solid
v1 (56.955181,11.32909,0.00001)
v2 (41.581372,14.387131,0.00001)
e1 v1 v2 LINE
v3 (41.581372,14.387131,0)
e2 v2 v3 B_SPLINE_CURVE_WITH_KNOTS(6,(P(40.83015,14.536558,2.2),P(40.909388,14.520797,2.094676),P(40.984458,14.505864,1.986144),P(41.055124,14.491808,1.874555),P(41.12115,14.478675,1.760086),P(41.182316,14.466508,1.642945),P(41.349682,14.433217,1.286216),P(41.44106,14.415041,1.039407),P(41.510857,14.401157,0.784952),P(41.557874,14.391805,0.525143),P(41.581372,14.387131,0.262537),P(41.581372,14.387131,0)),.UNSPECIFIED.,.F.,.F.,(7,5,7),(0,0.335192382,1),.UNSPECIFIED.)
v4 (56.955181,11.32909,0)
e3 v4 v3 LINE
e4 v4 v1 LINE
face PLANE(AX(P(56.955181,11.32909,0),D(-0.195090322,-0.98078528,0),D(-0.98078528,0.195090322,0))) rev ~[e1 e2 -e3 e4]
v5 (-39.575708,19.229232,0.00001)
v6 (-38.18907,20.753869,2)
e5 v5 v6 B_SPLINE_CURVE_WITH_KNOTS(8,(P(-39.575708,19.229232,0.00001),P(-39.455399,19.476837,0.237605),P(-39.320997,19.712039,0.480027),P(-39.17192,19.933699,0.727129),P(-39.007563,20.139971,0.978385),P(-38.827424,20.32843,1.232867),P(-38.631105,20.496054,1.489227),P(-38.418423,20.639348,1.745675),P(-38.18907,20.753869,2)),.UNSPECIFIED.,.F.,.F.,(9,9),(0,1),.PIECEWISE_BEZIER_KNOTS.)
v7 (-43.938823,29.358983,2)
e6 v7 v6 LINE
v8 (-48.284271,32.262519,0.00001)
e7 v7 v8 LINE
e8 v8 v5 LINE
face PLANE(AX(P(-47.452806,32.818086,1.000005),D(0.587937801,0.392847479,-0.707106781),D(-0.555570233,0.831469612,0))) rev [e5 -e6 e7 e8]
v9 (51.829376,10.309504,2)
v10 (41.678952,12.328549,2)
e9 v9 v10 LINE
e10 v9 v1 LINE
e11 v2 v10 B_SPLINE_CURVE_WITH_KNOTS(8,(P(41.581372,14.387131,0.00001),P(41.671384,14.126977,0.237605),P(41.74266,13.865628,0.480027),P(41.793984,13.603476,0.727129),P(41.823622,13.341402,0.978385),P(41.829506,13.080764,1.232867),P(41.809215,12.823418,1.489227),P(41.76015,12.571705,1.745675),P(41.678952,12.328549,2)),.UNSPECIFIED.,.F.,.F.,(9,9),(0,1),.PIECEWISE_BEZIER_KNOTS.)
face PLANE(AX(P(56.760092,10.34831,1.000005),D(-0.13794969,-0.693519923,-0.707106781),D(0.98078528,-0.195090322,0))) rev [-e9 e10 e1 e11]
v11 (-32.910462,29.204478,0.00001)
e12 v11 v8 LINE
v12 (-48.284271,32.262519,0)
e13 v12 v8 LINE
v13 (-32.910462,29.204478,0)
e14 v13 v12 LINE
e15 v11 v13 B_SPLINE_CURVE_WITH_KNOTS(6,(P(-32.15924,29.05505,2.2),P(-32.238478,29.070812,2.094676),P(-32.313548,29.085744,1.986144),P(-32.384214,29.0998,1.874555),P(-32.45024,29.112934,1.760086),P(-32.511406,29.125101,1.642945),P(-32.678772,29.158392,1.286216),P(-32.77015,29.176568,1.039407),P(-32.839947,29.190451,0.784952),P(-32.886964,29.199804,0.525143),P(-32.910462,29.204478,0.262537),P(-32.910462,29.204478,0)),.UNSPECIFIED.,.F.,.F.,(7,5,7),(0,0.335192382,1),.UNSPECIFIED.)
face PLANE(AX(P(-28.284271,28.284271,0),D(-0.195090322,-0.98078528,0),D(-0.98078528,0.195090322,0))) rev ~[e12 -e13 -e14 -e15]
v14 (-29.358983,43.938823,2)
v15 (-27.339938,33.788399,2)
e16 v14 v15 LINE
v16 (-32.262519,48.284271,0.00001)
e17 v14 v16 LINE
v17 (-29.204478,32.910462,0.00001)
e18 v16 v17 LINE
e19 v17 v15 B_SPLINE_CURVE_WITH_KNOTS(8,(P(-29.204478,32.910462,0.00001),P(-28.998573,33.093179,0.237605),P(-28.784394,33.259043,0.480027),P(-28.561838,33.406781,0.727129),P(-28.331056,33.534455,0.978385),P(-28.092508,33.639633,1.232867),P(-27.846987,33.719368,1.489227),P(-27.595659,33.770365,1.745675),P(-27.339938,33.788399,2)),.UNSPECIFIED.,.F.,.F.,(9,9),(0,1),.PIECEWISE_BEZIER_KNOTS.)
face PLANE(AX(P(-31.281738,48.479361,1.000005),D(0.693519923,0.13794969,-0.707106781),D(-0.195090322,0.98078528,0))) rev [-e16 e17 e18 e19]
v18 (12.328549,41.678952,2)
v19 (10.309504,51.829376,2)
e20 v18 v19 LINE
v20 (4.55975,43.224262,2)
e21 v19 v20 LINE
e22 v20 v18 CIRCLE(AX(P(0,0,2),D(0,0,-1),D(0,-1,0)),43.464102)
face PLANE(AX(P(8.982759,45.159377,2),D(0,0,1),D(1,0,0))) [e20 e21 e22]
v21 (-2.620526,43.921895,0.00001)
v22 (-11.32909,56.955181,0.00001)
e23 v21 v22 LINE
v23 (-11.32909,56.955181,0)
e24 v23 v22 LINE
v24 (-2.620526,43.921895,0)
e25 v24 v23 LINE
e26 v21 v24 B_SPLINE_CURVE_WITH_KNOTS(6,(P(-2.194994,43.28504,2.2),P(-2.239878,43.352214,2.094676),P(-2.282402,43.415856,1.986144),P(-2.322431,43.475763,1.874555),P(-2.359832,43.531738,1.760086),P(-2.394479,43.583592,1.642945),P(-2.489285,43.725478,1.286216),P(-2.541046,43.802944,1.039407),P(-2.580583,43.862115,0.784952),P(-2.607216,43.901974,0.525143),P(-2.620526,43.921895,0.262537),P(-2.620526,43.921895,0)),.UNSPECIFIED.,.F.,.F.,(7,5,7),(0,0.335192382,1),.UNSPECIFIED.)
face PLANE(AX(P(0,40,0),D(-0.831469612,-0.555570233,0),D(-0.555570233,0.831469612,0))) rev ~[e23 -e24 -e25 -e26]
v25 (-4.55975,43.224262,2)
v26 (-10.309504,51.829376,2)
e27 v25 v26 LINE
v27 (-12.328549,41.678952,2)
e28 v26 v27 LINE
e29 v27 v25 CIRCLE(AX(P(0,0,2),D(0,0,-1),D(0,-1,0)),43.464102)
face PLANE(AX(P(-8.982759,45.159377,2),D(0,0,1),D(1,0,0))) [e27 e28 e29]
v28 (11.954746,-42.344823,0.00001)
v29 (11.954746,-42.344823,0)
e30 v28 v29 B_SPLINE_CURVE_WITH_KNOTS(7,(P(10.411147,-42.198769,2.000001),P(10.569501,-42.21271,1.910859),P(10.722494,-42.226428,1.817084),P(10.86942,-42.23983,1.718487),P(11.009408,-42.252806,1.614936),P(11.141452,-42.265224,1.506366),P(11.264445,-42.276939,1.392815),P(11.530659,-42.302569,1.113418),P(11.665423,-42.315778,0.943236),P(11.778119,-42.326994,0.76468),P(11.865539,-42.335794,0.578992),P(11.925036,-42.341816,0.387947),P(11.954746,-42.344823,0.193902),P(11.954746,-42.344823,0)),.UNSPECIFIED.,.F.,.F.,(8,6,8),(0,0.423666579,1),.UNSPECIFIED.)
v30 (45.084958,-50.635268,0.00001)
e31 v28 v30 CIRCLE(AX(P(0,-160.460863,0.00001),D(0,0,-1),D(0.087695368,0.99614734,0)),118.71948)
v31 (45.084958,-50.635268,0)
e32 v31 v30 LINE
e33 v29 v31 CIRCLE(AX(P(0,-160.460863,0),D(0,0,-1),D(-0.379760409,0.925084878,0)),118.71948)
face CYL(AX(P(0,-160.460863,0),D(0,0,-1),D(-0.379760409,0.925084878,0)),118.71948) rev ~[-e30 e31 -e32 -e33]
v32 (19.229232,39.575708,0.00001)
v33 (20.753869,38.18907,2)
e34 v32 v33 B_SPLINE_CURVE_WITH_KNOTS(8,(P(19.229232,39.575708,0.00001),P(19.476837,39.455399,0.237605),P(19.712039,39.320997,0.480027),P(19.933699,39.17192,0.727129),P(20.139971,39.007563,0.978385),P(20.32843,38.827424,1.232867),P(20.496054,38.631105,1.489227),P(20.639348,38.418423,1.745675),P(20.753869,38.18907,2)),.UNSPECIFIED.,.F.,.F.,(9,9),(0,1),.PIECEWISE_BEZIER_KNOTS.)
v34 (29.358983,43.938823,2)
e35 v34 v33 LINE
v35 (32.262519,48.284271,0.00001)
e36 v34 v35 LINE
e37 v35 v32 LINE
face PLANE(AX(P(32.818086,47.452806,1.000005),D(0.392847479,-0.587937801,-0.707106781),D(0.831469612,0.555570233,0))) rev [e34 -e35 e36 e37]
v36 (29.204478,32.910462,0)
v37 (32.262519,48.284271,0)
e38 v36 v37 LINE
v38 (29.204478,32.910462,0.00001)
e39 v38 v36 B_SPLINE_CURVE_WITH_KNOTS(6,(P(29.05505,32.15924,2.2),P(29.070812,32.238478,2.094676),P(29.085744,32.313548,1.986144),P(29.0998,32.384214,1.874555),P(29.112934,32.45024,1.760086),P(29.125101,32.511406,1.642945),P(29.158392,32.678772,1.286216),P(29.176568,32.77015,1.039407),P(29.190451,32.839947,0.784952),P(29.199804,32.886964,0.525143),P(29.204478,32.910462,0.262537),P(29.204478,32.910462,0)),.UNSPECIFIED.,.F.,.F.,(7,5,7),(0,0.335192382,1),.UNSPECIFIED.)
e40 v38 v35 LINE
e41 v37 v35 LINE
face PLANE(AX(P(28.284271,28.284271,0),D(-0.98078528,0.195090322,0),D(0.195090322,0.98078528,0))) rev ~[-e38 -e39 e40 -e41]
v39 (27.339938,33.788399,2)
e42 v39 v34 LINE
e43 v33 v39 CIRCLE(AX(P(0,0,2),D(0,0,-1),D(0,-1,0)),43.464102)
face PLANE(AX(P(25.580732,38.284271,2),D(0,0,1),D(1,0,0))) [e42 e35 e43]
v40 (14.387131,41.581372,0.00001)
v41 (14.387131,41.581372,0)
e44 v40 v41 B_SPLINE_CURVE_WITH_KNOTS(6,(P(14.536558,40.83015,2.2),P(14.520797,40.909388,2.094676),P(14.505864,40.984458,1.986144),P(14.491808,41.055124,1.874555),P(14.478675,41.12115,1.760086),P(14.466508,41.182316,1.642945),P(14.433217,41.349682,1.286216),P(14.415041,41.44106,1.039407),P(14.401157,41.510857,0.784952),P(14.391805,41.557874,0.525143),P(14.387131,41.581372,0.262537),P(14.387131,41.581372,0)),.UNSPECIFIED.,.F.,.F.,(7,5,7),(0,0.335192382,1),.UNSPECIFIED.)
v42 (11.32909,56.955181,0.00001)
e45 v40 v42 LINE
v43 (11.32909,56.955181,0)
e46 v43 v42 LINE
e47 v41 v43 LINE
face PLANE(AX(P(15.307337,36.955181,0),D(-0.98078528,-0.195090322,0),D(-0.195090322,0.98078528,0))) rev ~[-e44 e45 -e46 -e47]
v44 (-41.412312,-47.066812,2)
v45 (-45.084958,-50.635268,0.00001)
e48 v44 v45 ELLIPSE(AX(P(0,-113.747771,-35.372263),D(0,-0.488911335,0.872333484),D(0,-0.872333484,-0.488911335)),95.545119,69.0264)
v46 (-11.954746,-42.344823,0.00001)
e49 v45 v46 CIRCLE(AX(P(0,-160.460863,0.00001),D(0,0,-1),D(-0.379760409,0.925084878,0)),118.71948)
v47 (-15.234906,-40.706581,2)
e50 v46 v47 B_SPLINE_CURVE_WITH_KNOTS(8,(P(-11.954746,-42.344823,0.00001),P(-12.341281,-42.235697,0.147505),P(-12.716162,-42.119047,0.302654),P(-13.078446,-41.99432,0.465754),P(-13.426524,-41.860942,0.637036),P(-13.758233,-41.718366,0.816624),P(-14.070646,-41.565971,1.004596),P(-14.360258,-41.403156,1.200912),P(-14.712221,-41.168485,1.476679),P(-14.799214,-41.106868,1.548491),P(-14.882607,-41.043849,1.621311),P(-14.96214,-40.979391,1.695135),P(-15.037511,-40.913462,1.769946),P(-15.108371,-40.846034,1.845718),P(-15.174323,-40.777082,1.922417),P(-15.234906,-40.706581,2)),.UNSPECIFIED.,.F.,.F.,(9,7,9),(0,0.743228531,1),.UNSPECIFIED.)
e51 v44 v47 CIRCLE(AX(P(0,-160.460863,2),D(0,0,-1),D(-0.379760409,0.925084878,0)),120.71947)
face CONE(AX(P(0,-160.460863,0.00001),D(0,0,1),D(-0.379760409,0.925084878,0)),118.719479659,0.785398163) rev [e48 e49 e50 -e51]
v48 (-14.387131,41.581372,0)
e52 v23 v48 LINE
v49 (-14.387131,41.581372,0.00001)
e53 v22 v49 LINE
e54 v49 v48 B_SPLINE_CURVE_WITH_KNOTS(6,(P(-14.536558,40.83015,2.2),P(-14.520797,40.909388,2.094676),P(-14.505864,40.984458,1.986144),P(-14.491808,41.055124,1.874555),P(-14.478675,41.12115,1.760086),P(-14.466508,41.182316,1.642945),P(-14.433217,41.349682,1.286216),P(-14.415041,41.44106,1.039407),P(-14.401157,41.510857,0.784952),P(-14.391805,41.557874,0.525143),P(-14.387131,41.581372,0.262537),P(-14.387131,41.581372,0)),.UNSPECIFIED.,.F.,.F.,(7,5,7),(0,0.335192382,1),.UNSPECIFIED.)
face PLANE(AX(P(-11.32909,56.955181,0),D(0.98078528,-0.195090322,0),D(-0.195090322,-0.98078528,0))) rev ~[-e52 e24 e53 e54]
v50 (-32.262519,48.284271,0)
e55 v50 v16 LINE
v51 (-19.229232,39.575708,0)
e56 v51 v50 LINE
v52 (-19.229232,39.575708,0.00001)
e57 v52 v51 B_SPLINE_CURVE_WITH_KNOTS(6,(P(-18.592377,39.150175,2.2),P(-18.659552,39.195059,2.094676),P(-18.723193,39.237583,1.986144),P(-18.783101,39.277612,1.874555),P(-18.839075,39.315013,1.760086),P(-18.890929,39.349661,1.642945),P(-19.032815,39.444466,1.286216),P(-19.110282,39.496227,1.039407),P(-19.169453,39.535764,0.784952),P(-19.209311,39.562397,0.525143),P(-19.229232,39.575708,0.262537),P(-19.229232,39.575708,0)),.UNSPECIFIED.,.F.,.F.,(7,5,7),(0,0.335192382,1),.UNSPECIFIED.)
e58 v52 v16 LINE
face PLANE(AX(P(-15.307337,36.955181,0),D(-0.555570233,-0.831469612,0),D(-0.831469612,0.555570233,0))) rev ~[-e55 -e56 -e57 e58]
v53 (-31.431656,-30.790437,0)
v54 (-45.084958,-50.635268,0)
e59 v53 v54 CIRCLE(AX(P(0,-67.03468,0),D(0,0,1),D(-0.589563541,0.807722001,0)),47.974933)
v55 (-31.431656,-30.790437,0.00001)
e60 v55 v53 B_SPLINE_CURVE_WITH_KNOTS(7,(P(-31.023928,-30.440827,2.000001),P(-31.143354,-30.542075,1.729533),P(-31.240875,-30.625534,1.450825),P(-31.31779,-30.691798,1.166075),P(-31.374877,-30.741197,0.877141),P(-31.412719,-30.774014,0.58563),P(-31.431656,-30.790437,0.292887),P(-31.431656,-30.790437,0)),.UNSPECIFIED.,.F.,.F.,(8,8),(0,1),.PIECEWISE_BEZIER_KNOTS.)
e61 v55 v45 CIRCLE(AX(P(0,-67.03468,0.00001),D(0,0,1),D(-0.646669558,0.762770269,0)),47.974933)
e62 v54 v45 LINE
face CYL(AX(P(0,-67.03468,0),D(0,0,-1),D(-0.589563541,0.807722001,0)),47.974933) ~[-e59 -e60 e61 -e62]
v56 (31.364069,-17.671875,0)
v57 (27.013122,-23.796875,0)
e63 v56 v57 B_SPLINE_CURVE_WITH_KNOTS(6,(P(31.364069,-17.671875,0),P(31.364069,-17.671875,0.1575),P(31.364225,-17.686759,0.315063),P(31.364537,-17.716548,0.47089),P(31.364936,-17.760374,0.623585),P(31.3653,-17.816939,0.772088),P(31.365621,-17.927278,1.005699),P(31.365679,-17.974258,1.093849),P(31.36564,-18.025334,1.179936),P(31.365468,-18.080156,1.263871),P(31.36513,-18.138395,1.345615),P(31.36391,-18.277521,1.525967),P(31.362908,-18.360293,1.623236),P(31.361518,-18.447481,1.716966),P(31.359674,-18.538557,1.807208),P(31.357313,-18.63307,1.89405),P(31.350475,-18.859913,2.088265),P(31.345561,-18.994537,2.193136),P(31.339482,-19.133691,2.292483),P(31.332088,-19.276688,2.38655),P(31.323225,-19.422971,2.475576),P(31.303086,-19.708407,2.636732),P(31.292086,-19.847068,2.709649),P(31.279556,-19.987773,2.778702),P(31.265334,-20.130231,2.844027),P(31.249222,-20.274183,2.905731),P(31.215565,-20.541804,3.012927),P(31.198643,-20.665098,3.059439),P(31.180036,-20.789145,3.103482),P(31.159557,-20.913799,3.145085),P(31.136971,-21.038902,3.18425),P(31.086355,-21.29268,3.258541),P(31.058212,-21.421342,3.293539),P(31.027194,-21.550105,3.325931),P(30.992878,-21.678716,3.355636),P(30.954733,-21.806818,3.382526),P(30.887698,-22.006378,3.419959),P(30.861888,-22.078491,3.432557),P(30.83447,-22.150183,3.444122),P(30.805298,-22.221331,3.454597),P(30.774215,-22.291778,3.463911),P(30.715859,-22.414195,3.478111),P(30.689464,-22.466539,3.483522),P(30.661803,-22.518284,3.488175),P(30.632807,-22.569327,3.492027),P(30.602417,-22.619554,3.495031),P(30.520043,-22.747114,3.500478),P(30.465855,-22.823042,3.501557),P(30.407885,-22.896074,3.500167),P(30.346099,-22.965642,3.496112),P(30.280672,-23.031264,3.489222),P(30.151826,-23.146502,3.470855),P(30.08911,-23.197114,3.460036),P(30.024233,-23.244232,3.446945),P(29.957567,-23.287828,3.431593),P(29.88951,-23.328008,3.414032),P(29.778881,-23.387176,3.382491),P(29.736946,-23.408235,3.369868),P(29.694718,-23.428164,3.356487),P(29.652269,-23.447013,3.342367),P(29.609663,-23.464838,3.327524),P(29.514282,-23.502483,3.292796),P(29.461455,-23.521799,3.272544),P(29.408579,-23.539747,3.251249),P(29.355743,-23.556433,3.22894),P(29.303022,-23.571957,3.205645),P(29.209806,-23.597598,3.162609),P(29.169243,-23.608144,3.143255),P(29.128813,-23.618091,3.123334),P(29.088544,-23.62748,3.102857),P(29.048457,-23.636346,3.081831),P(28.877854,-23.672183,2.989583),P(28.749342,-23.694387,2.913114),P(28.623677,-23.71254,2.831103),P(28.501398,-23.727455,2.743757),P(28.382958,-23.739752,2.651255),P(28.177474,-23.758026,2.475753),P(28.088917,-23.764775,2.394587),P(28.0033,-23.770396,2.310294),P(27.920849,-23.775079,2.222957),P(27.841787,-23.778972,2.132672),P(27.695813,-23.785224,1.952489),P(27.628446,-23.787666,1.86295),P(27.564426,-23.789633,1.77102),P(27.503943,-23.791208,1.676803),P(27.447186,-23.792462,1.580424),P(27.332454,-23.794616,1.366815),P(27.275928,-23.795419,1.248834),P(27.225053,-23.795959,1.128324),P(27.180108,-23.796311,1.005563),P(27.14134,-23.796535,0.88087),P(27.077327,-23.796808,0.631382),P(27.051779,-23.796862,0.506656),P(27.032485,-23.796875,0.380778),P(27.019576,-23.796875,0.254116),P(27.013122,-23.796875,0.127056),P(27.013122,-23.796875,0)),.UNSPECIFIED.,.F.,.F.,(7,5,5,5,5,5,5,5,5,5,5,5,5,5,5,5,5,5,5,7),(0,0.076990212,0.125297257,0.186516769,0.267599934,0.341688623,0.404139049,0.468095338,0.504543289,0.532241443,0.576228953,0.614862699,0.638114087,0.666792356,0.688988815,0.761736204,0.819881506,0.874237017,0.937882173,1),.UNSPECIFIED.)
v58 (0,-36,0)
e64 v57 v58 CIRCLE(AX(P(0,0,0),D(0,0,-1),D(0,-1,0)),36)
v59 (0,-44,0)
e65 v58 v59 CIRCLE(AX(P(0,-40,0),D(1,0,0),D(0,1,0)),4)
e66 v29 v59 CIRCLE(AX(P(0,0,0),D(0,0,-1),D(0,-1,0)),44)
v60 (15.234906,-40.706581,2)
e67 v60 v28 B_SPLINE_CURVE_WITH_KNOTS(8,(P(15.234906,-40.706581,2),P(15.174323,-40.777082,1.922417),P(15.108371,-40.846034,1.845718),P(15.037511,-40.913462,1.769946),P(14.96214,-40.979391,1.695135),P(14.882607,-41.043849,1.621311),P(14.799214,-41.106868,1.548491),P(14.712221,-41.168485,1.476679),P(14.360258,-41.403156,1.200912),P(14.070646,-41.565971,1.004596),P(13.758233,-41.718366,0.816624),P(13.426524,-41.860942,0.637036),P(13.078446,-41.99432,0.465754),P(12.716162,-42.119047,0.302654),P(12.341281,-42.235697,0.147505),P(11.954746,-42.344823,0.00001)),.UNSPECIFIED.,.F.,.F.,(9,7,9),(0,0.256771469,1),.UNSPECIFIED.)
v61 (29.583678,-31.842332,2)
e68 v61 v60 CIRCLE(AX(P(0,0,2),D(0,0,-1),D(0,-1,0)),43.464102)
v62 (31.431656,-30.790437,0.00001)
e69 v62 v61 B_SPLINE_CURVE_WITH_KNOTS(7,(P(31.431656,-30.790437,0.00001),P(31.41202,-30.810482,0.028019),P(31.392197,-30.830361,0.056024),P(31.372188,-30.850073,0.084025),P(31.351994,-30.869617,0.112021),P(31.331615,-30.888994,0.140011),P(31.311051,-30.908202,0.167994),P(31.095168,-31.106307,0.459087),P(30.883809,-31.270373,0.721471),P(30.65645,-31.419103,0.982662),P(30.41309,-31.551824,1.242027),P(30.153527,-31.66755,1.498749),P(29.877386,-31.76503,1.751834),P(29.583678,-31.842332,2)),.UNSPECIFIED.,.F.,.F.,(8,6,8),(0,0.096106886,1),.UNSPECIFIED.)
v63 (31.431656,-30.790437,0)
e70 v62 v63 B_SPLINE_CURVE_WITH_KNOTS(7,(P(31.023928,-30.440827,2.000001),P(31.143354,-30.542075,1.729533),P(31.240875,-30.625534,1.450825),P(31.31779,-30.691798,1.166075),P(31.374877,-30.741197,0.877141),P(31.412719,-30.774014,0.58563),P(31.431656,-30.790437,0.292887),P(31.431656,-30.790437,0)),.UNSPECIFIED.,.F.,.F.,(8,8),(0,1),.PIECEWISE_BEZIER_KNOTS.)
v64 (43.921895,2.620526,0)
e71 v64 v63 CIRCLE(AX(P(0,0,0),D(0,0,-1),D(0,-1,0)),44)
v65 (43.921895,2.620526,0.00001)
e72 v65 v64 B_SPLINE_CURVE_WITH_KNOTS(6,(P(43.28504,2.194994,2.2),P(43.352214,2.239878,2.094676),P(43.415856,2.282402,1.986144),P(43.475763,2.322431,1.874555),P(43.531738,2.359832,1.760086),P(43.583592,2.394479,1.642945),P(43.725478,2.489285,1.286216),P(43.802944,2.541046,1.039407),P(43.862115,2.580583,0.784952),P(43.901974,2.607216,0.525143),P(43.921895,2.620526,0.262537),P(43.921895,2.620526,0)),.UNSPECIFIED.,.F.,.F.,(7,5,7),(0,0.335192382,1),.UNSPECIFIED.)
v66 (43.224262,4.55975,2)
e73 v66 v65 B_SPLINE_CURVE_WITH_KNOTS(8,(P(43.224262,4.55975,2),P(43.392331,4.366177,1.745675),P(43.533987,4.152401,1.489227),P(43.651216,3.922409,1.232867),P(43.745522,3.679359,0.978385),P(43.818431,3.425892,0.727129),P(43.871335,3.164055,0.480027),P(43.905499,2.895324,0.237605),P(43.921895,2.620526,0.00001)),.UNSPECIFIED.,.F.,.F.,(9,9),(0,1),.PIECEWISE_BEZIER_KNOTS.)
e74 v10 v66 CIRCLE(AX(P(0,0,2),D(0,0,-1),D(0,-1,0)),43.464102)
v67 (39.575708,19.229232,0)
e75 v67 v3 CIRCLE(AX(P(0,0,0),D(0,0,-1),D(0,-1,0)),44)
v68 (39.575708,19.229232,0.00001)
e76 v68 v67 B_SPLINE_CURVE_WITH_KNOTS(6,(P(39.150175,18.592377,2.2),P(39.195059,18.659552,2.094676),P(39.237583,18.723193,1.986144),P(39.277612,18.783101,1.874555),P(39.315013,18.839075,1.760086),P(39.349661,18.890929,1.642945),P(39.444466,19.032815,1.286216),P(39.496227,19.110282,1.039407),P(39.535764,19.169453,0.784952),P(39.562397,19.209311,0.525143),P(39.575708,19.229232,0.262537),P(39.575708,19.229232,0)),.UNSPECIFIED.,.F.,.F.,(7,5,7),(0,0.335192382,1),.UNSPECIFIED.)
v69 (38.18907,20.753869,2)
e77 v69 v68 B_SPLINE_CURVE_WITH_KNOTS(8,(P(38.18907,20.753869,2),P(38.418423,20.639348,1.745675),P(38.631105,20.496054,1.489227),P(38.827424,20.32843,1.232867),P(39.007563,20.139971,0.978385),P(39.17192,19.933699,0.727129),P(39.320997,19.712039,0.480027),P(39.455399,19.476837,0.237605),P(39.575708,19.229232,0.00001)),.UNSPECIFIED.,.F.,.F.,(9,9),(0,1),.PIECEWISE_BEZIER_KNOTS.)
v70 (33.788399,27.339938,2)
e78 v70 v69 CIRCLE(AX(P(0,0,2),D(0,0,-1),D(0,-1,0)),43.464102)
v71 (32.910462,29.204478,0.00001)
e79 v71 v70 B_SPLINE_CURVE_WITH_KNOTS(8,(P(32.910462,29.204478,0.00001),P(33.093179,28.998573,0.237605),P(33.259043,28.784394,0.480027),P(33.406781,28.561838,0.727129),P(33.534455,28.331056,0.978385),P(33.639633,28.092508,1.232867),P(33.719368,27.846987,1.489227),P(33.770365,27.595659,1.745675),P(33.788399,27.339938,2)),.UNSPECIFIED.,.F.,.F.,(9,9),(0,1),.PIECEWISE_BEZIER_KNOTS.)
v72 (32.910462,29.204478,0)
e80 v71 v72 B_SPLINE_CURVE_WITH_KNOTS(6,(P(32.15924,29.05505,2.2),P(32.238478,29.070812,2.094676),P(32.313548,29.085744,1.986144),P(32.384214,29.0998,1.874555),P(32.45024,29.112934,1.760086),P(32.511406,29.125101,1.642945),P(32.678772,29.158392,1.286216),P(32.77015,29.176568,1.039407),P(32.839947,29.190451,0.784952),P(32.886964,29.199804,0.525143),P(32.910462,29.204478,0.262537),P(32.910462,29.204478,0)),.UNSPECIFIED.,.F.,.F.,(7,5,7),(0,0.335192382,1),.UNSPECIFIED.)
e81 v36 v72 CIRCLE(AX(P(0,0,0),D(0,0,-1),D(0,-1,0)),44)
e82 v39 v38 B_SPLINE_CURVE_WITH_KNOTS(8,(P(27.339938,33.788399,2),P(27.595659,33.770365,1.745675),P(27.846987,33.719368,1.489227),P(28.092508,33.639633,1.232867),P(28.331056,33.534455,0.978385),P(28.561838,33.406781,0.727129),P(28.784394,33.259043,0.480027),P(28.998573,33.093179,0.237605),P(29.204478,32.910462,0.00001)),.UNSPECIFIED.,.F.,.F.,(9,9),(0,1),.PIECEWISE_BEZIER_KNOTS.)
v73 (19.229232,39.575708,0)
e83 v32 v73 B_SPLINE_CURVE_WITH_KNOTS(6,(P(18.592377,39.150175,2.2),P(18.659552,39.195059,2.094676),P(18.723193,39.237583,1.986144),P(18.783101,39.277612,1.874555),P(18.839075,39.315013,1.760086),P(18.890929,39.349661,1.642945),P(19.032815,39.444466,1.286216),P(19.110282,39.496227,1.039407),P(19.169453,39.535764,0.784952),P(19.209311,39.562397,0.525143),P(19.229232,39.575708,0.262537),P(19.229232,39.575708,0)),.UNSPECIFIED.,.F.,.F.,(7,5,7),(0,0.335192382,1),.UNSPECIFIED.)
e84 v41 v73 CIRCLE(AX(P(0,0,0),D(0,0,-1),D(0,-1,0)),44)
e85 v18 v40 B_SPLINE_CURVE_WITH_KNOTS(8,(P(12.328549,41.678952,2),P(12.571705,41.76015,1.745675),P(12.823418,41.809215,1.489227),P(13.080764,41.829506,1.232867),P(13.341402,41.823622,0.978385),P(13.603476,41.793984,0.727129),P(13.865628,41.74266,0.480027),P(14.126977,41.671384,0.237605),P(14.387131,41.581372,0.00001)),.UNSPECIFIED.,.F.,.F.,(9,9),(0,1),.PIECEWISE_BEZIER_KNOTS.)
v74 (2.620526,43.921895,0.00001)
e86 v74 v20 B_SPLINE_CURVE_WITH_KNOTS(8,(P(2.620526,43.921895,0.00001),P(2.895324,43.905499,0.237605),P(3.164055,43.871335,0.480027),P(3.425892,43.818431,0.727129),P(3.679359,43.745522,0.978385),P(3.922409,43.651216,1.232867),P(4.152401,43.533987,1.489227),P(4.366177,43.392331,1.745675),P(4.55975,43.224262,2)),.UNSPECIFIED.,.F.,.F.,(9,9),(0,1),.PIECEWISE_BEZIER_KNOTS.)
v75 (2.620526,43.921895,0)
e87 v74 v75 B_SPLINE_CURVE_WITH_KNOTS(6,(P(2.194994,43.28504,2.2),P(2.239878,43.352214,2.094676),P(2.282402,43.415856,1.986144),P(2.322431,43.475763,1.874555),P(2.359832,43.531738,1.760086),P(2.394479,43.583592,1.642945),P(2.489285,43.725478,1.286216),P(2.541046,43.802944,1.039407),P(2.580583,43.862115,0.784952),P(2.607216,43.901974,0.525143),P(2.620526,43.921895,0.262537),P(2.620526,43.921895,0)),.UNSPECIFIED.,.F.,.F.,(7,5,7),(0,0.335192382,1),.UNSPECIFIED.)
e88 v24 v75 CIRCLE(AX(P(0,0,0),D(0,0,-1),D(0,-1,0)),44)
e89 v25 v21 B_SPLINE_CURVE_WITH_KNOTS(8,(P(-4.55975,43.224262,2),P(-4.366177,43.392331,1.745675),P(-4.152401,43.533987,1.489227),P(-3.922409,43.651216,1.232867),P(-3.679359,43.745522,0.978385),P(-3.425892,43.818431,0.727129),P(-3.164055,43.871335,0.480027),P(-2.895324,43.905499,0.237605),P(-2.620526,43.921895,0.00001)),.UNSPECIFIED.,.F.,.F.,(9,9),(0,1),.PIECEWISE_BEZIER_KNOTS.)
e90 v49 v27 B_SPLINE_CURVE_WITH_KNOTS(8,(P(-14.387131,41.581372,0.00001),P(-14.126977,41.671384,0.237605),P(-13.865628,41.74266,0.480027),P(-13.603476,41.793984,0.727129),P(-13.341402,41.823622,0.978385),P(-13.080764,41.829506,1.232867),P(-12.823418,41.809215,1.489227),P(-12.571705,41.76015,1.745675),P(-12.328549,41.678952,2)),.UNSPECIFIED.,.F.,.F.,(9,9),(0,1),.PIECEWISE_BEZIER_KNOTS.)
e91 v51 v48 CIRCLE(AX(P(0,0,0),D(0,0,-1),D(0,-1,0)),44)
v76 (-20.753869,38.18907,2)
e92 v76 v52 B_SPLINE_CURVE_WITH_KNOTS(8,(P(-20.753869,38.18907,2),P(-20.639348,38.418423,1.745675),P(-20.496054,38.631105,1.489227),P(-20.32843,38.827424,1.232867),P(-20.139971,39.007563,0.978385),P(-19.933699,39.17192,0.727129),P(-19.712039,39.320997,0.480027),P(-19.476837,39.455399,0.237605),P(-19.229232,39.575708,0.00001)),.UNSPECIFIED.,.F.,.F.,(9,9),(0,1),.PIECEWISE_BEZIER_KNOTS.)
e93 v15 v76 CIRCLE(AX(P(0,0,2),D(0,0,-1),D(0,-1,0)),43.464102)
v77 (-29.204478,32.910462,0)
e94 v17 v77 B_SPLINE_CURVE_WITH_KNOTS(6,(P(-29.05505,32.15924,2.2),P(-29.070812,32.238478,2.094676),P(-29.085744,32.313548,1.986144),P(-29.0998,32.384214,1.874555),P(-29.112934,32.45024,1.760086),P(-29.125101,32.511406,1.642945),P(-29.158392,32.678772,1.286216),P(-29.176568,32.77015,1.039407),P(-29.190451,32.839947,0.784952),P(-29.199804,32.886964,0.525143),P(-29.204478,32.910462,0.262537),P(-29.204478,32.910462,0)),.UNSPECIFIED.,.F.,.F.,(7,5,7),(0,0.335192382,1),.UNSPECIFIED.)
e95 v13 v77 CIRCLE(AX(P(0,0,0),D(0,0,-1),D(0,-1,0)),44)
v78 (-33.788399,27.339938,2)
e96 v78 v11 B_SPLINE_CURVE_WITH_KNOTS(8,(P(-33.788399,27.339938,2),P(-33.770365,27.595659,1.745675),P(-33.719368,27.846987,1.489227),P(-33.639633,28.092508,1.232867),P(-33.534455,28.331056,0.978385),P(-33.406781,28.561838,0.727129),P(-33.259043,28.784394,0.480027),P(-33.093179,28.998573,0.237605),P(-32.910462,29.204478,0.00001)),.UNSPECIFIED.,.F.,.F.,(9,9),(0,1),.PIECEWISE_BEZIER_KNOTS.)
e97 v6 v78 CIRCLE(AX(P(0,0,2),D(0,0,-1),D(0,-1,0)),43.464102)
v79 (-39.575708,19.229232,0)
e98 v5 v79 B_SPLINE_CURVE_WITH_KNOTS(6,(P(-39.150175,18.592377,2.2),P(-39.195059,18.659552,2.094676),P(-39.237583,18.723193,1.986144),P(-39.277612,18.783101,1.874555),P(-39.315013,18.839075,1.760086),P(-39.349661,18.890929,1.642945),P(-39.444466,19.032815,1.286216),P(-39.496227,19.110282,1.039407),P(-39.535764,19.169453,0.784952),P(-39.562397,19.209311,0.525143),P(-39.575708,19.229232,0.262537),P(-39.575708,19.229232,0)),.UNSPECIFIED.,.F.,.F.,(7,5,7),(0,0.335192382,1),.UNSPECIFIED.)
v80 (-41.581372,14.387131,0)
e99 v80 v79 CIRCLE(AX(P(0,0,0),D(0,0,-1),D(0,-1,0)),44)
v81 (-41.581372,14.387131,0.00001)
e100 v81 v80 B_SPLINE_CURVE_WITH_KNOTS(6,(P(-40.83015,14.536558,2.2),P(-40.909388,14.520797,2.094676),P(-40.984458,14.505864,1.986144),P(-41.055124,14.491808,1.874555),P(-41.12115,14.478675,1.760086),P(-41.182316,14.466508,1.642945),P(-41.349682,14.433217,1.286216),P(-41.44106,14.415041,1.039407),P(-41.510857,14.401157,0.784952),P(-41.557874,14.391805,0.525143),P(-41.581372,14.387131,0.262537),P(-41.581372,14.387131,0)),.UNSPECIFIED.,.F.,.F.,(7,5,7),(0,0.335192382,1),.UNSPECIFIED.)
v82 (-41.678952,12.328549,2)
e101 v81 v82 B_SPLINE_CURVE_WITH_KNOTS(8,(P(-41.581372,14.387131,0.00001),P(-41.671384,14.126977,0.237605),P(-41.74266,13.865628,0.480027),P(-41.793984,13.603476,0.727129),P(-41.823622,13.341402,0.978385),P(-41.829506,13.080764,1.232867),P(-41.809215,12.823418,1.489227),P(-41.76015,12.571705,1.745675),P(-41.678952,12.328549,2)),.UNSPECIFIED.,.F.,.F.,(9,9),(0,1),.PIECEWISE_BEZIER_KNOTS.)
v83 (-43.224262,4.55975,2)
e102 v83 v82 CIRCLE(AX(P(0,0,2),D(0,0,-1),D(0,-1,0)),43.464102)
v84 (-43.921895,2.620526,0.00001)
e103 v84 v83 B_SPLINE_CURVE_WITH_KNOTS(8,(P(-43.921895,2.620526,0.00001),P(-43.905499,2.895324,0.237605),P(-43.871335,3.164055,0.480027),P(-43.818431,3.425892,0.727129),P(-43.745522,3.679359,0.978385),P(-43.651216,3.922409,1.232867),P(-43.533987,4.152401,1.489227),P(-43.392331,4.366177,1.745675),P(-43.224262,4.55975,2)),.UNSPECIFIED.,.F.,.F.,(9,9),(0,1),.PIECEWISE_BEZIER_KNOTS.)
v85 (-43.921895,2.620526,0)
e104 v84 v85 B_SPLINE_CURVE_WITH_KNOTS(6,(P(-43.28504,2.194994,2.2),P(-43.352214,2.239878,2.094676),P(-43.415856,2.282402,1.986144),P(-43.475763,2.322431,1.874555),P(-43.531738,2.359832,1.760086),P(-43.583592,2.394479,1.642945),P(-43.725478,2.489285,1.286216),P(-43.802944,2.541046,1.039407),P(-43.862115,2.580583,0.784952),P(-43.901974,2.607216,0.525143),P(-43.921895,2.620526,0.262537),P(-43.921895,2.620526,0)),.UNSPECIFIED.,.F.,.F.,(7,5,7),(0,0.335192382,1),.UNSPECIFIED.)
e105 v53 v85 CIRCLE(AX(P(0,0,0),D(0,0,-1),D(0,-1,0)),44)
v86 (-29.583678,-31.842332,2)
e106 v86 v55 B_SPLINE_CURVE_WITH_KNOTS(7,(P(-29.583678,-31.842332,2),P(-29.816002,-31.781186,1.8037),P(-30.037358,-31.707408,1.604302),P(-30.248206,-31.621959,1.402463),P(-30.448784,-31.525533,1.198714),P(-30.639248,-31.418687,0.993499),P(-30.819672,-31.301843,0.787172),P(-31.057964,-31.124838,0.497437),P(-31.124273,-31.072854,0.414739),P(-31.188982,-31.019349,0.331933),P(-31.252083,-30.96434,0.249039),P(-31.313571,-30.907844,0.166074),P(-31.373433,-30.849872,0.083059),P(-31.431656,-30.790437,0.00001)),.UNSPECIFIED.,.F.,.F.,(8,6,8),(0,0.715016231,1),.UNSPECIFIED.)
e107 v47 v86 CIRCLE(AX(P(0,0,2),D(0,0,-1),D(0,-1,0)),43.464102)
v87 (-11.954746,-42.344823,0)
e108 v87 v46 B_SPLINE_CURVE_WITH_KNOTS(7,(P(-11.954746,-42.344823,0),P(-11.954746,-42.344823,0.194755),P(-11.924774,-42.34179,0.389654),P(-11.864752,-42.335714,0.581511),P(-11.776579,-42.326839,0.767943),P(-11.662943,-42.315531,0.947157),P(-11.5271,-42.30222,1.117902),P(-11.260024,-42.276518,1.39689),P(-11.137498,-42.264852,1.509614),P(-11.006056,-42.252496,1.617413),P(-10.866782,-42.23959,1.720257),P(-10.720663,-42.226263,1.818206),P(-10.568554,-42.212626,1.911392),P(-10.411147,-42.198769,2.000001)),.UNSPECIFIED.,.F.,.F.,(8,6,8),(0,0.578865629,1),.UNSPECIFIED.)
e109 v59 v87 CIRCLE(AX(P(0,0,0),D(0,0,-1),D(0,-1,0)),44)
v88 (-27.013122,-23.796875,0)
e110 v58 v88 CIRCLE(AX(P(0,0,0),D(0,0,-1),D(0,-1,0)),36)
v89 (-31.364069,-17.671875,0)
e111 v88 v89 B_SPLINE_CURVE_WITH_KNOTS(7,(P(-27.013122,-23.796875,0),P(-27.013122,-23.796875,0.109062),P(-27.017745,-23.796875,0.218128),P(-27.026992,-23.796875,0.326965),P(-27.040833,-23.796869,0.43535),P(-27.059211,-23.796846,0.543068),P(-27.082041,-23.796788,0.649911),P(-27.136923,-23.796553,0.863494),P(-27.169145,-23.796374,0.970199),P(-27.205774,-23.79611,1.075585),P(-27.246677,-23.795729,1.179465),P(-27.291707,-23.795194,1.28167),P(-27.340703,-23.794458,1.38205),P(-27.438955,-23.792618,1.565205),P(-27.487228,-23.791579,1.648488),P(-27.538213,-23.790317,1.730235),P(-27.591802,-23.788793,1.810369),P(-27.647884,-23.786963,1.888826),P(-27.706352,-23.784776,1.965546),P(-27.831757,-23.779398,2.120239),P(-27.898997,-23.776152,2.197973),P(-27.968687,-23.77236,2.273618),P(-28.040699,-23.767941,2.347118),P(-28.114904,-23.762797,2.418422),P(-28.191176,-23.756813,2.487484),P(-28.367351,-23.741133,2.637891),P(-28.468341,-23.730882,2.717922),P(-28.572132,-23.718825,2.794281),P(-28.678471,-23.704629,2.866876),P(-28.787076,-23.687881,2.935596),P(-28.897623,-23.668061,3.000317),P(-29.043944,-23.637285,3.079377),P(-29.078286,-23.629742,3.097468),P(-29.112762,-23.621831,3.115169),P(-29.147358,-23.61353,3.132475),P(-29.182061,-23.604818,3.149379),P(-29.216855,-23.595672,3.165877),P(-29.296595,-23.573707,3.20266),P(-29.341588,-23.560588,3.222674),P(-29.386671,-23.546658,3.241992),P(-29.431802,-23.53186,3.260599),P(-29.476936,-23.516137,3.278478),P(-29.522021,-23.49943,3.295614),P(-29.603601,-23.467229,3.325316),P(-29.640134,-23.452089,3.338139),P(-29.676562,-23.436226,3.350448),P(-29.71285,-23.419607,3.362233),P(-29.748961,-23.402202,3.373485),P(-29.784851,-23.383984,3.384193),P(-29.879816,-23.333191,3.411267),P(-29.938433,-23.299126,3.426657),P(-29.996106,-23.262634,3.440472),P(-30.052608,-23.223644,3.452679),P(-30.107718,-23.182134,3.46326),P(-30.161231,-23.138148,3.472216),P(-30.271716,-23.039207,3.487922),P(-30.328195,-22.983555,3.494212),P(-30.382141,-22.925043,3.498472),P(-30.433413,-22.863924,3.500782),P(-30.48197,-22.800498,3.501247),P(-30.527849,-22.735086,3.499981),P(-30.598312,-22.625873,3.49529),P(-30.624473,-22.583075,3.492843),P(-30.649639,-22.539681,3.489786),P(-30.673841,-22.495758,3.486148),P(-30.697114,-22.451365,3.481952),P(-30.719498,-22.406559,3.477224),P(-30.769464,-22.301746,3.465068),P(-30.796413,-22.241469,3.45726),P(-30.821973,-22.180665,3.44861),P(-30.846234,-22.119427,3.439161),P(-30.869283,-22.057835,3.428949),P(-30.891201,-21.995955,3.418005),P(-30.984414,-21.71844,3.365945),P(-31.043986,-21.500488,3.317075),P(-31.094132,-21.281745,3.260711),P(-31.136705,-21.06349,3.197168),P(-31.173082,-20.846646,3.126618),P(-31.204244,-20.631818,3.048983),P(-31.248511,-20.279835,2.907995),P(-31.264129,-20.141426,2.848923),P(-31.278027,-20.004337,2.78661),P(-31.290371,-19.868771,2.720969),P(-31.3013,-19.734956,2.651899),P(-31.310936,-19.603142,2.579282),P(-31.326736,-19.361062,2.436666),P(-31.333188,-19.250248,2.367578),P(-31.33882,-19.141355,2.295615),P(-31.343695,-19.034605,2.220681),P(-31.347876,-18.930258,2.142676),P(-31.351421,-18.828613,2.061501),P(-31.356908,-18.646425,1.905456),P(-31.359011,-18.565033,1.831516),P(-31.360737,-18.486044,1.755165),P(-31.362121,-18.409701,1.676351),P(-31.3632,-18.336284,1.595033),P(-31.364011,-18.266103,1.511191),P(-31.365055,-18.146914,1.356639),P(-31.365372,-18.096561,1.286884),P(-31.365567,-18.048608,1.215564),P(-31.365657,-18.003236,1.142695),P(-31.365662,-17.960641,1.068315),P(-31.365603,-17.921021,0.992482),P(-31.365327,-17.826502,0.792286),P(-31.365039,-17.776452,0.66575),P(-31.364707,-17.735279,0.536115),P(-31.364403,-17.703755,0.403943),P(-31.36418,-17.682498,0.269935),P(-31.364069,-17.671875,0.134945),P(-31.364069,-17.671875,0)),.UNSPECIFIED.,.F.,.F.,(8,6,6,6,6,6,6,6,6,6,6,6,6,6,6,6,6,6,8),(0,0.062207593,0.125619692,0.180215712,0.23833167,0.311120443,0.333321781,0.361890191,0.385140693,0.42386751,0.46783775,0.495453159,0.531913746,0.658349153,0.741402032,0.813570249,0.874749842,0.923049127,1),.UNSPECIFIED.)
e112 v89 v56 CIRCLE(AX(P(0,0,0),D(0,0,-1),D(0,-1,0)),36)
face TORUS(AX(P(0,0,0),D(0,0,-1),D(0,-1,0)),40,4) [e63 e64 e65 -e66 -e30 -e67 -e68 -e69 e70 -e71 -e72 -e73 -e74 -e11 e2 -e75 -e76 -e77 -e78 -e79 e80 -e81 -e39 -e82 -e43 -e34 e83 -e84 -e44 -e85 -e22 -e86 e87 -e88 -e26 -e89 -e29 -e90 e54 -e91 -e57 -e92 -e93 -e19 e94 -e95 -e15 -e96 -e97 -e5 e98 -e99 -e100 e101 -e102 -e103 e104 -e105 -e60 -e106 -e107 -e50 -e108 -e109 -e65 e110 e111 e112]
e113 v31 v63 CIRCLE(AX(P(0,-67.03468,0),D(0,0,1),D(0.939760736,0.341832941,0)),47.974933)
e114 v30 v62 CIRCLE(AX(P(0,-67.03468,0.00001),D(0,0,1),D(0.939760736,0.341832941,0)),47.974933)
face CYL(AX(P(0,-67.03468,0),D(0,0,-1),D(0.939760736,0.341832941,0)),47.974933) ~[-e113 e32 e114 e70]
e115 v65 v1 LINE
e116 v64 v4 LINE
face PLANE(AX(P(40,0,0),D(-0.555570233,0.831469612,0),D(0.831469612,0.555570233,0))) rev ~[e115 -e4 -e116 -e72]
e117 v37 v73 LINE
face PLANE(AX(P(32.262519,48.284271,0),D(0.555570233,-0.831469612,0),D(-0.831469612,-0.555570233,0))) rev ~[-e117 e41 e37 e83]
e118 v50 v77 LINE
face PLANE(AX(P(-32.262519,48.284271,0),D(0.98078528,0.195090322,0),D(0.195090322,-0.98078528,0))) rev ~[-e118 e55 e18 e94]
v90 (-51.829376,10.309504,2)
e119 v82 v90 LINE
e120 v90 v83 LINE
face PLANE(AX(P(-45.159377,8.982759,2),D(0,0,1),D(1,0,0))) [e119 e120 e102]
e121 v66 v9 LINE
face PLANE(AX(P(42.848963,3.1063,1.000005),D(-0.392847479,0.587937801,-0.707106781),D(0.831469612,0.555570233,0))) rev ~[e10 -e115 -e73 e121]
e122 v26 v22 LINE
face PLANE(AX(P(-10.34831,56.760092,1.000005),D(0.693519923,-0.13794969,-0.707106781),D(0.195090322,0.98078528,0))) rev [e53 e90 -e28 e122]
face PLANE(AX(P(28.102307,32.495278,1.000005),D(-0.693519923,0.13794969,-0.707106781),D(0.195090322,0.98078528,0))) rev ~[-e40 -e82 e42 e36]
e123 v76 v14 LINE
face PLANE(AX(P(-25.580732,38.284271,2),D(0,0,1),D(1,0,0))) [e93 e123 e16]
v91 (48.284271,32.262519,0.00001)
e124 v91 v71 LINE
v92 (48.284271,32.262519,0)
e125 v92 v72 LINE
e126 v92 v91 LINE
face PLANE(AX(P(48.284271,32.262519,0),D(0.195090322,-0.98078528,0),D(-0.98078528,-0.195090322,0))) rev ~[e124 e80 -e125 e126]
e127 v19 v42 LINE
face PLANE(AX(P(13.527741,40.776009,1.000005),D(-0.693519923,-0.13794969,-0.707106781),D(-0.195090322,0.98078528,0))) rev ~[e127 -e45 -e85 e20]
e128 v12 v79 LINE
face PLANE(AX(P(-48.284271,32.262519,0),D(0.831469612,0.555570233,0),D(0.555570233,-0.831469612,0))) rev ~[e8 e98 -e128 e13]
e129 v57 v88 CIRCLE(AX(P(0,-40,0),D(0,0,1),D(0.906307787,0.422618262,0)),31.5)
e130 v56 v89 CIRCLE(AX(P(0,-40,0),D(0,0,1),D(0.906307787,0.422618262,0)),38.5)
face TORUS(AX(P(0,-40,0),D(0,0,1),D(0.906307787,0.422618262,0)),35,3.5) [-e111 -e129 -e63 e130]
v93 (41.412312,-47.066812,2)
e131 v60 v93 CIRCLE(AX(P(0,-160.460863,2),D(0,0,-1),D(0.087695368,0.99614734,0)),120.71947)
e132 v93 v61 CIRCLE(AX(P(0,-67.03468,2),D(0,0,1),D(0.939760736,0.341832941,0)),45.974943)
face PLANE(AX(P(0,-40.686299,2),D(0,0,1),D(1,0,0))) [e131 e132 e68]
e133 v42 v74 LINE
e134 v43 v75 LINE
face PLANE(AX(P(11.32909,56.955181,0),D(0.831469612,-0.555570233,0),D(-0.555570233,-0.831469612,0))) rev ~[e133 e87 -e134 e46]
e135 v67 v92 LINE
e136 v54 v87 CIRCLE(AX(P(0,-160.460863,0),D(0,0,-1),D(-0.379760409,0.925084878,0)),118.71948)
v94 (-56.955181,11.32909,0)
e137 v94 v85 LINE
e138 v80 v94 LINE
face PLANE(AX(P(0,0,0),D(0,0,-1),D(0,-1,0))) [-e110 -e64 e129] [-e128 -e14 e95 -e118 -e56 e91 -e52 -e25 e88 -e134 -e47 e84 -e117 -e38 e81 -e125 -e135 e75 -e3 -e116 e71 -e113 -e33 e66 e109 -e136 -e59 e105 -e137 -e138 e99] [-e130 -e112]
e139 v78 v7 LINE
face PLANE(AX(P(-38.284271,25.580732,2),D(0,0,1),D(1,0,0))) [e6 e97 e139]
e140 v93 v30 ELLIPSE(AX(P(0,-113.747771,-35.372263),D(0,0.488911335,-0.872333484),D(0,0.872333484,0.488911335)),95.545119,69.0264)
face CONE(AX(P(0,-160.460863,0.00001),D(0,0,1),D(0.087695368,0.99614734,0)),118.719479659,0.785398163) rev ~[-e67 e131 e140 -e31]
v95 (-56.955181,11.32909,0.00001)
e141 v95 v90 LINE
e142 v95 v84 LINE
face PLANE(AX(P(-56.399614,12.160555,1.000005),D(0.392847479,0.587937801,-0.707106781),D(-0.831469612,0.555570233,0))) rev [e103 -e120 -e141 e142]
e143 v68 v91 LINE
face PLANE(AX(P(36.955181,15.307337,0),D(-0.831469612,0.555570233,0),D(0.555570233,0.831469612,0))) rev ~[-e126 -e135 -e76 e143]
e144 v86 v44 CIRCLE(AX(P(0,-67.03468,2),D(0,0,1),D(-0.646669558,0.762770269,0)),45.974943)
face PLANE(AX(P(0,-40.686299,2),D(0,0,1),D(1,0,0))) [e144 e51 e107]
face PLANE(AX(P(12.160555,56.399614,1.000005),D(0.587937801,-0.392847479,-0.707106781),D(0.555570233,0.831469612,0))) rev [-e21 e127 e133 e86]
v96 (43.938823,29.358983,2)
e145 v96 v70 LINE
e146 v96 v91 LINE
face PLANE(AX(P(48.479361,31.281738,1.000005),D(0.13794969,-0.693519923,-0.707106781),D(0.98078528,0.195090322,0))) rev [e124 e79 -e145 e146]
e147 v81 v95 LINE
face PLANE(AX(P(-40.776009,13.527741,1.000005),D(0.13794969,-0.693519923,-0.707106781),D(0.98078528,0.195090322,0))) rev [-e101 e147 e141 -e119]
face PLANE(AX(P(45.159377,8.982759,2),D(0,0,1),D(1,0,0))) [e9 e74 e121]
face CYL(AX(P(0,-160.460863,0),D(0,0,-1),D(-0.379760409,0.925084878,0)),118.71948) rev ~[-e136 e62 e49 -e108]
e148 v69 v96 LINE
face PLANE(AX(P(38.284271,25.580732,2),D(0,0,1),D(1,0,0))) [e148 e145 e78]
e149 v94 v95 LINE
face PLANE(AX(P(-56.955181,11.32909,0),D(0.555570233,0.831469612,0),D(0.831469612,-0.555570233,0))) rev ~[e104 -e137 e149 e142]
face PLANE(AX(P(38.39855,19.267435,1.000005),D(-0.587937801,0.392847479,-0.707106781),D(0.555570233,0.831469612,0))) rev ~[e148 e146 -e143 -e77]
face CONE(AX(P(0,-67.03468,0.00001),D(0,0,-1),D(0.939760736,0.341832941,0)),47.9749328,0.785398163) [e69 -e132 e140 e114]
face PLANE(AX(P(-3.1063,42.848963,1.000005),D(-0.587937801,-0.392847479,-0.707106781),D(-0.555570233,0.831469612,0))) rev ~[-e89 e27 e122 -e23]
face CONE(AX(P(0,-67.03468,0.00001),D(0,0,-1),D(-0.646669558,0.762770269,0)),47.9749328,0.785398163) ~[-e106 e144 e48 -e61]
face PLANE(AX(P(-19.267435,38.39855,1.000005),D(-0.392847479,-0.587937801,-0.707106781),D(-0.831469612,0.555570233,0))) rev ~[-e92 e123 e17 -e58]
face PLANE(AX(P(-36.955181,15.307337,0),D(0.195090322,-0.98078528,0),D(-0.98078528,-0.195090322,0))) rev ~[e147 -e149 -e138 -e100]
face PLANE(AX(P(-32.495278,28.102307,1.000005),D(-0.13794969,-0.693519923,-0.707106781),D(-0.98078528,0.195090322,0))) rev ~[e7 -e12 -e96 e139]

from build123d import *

# Parameters (mm, degrees)
F3_DEPTH      = 2
F4_SIZE       = 1.99999
F6_ANGLE_BACK = 65
F6_ANGLE      = 130


# Not quite as in the source:
# - a fillet or chamfer is up to 0.001 mm smaller than in the source, because OpenCascade refuses the exact size


with BuildPart() as f1:
    # F0 (on Right) → F1 (revolve)
    with BuildSketch(Plane.YZ):
        with BuildLine():
            Line((-44, 0), (-36, 0))
            ThreePointArc((-36, 0), (-40, 4), (-44, 0))
        make_face()
    revolve(axis=Axis((0, 0, -2.6855529286), (0, 0, -1)))

    # F2 (on Top) → F3 (join)
    with BuildSketch(Plane.XY):
        Polygon((-40, 0), (-36.9551813005, 15.3073372946), (-56.9551813005, 11.329089947), align=None)
        Polygon((-36.9551813005, 15.3073372946), (-28.2842712475, 28.2842712475), (-48.2842712475, 32.2625185951), align=None)
        Polygon((-28.2842712475, 28.2842712475), (-15.3073372946, 36.9551813005), (-32.2625185951, 48.2842712475), align=None)
        Polygon((-15.3073372946, 36.9551813005), (0, 40), (-11.329089947, 56.9551813005), align=None)
        Polygon((11.329089947, 56.9551813005), (0, 40), (15.3073372946, 36.9551813005), align=None)
        Polygon((32.2625185951, 48.2842712475), (15.3073372946, 36.9551813005), (28.2842712475, 28.2842712475), align=None)
        Polygon((48.2842712475, 32.2625185951), (28.2842712475, 28.2842712475), (36.9551813005, 15.3073372946), align=None)
        Polygon((56.9551813005, 11.329089947), (36.9551813005, 15.3073372946), (40, 0), align=None)
        with BuildLine():
            ThreePointArc((45.08495815, -50.6352676217), (38.3490901499, -38.208624723), (28.2842712475, -28.2842712475))
            Line((28.2842712475, -28.2842712475), (15.3073372946, -36.9551813005))
            Line((15.3073372946, -36.9551813005), (0, -40))
            Line((0, -40), (-15.3073372946, -36.9551813005))
            Line((-15.3073372946, -36.9551813005), (-28.2842712475, -28.2842712475))
            ThreePointArc((-28.2842712475, -28.2842712475), (-38.3490901499, -38.208624723), (-45.08495815, -50.6352676217))
            ThreePointArc((-45.08495815, -50.6352676217), (0, -41.7413833361), (45.08495815, -50.6352676217))
        make_face()
    extrude(amount=F3_DEPTH)

    # F4 (size 2 in the source; OpenCascade refuses exactly that, so slightly less here)
    f4_edges = [f1.edges().sort_by_distance(p)[0] for p in [
        (-50.179856, 6.801962, 2),
        (-48.96314, 12.918806, 2),
        (-40.29223, 30.672803, 2),
        (-43.757144, 25.487193, 2),
        (-25.487193, 43.757144, 2),
        (-30.672803, 40.29223, 2),
        (-6.801962, 50.179856, 2),
        (-12.918806, 48.96314, 2),
        (12.918806, 48.96314, 2),
        (6.801962, 50.179856, 2),
        (30.672803, 40.29223, 2),
        (25.487193, 43.757144, 2),
        (43.757144, 25.487193, 2),
        (40.29223, 30.672803, 2),
        (50.179856, 6.801962, 2),
        (48.96314, 12.918806, 2),
        (-39.37124, -39.621186, 2),
        (-28.06685, -45.10677, 2),
        (28.06685, -45.10677, 2),
        (39.37124, -39.621186, 2),
    ]]
    chamfer(f4_edges, length=F4_SIZE)

    # F5 (on Right) → F6 (revolve)
    with BuildSketch(Plane.YZ, mode=Mode.PRIVATE) as f6_sk:
        with BuildLine():
            Line((-8.5, 0), (-1.5, 0))
            ThreePointArc((-1.5, 0), (-5, 3.5), (-8.5, 0))
        make_face()
    revolve(f6_sk.sketch.rotate(Axis((0, -40, 2.6011376176), (0, 0, 1)), -F6_ANGLE_BACK), axis=Axis((0, -40, 2.6011376176), (0, 0, 1)), revolution_arc=F6_ANGLE)


solid = f1.part
